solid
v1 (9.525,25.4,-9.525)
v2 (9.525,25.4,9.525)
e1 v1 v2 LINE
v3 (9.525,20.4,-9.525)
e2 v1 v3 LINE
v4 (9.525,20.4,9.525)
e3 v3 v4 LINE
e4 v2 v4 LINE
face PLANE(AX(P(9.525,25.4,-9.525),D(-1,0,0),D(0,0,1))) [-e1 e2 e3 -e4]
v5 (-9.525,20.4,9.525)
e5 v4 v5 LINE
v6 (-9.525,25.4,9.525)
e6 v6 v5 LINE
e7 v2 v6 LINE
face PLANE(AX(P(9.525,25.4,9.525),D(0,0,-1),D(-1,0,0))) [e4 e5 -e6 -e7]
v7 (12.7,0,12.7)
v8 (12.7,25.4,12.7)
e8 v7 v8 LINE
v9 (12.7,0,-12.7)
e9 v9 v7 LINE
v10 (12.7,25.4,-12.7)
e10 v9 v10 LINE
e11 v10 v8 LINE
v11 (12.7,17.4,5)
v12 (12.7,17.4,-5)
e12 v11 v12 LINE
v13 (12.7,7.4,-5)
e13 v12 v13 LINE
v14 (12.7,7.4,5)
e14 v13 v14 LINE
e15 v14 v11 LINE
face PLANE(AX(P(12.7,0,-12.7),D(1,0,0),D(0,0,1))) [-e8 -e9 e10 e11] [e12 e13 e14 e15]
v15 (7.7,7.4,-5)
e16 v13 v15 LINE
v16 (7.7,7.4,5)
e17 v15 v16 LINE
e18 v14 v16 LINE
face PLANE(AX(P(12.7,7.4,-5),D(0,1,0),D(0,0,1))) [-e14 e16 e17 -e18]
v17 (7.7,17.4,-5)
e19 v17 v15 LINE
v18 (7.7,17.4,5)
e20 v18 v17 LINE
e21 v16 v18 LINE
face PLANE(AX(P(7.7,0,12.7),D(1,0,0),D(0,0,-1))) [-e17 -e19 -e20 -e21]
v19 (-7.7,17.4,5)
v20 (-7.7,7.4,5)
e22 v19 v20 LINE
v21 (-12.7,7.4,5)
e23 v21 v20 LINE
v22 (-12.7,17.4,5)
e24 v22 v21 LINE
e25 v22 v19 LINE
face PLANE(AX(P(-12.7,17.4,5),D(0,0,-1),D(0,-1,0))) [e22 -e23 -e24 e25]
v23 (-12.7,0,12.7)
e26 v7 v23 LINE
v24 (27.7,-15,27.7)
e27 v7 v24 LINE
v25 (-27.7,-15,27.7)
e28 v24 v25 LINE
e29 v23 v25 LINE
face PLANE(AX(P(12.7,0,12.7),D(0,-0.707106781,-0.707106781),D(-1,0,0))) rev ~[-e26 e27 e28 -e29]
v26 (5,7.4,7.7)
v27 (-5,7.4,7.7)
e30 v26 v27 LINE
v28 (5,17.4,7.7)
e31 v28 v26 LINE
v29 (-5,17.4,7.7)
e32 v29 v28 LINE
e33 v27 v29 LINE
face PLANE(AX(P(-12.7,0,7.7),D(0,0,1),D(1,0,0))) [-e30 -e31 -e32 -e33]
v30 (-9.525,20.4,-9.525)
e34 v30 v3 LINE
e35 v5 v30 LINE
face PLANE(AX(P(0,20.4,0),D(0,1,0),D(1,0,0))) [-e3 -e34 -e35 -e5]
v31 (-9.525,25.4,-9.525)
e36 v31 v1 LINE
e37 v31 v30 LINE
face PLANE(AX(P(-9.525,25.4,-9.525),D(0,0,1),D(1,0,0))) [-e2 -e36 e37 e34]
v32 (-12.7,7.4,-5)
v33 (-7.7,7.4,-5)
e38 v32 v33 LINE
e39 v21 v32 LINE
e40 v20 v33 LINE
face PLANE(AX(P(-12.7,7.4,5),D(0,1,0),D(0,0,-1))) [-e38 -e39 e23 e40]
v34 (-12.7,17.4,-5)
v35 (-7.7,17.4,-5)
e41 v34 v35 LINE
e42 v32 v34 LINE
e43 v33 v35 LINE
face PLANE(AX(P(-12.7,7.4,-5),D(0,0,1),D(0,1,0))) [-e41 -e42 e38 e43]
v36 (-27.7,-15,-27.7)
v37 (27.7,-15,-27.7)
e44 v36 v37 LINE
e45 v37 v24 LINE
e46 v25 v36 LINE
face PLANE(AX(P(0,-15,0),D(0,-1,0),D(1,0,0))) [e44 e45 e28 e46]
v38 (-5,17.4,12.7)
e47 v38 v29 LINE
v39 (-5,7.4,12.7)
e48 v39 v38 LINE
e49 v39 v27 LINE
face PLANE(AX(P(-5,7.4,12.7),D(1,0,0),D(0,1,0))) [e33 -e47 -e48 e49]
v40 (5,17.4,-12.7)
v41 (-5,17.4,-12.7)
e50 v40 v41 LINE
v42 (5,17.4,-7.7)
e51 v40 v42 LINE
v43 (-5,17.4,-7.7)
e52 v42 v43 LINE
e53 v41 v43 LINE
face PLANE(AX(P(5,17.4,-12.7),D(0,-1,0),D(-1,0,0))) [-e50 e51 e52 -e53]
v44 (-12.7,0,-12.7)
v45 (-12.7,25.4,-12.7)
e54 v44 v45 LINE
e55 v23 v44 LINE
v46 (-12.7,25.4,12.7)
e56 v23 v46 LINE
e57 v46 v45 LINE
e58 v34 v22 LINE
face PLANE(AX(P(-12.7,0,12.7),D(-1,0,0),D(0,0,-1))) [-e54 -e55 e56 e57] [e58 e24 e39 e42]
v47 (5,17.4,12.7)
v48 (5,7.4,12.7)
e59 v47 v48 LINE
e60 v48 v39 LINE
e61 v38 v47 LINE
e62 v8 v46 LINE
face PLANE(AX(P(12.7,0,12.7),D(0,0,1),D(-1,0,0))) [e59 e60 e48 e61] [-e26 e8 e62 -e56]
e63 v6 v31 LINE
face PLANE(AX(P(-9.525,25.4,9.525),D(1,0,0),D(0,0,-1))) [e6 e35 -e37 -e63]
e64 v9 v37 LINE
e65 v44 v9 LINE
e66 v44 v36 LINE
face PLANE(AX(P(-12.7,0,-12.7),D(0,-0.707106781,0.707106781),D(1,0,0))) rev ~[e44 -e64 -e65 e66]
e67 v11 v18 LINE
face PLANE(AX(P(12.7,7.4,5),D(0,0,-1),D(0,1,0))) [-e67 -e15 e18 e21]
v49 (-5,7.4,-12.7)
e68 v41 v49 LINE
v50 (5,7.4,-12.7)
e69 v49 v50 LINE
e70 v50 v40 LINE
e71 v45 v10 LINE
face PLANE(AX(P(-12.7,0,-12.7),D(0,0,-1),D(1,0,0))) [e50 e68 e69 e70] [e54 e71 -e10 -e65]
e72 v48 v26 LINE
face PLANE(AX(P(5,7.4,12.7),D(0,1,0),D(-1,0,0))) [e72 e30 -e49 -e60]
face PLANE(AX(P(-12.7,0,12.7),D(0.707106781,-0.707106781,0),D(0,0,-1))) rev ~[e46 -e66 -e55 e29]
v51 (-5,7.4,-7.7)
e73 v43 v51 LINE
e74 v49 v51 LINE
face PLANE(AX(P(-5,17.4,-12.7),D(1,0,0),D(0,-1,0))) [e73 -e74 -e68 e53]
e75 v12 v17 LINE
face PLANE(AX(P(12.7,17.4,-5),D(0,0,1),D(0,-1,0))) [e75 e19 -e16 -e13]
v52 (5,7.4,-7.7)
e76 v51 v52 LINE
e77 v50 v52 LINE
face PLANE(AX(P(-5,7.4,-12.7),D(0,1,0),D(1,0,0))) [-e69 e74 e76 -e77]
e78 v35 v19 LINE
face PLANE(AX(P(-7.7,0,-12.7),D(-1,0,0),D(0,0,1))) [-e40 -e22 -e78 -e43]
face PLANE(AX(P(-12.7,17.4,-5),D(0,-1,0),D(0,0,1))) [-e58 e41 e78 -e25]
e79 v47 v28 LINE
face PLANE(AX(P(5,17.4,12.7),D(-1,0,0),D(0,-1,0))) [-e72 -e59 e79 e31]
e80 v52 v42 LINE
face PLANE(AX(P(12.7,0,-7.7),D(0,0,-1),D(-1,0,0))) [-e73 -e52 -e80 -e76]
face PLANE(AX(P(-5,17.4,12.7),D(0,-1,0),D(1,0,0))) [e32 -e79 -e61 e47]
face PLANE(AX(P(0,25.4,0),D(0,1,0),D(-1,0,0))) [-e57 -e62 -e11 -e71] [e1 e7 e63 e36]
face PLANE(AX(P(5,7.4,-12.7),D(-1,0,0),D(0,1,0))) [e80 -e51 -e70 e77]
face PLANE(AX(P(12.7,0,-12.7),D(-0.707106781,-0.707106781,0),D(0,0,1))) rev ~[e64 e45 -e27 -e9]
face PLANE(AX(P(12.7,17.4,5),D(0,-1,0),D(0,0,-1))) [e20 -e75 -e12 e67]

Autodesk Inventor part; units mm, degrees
ref_plane "YZ Plane" through (0, 0, 0) normal (1, 0, 0) x (0, 1, 0)
ref_plane "XZ Plane" through (0, 0, 0) normal (0, 1, 0) x (-1, 0, 0)
ref_plane "XY Plane" through (0, 0, 0) normal (0, 0, 1) x (1, 0, 0)
sketch "Sketch1" plane through (0, 0, 0) normal (0, 1, 0) x (-1, 0, 0)
  line L0 (-12.7, -12.7) -> (-12.7, 12.7)
  line L1 (-12.7, 12.7) -> (12.7, 12.7)
  line L2 (12.7, 12.7) -> (12.7, -12.7)
  line L3 (12.7, -12.7) -> (-12.7, -12.7)
  point P0 (0, 0)
  point P1 (0, 0)
  dimension "d0" = 25.4
extrude "Extrusion1" add sketch "Sketch1" along normal blind 25.4
sketch "Sketch2" plane through (0, 25.4, 0) normal (0, 1, 0) x (1, 0, 0)
  line L0 (9.525, 9.525) -> (9.525, -9.525)
  line L1 (9.525, -9.525) -> (-9.525, -9.525)
  line L2 (-9.525, -9.525) -> (-9.525, 9.525)
  line L3 (-9.525, 9.525) -> (9.525, 9.525)
  point P0 (0, 0)
  point P1 (0, 0)
  dimension "d3" = 19.05
extrude "Extrusion2" cut sketch "Sketch2" against normal blind 5
sketch "Sketch3" plane through (12.7, 0, 12.7) normal (1, 0, 0) x (0, 0, -1)
  line L0 (22.225, 20.4) -> (3.175, 20.4) projected
  line L1 (17.7, 7.4) -> (7.7, 7.4)
  line L2 (7.7, 7.4) -> (7.7, 17.4)
  line L3 (7.7, 17.4) -> (17.7, 17.4)
  line L4 (17.7, 17.4) -> (17.7, 7.4)
  point P0 (12.7, 0)
  point P1 (12.7, 12.4)
  dimension "d6" = 10
extrude "Extrusion3" cut sketch "Sketch3" against normal blind 5
pattern_circular "Circular Pattern1" count 4 over 360 about axis through (0, -10, 0) along (0, 1, 0) of "Extrusion3"
sketch "Sketch4" plane through (0, 0, 0) normal (0, -1, 0) x (1, 0, 0)
  line L0 (12.7, -12.7) -> (12.7, 12.7) projected
  line L1 (12.7, 12.7) -> (-12.7, 12.7) projected
  line L2 (-12.7, 12.7) -> (-12.7, -12.7) projected
  line L3 (-12.7, -12.7) -> (12.7, -12.7) projected
  point P0 (0, 0)
extrude "Extrusion4" add sketch "Sketch4" along normal blind 15 draft 45
properties part number "frame_nexus_2_base"
